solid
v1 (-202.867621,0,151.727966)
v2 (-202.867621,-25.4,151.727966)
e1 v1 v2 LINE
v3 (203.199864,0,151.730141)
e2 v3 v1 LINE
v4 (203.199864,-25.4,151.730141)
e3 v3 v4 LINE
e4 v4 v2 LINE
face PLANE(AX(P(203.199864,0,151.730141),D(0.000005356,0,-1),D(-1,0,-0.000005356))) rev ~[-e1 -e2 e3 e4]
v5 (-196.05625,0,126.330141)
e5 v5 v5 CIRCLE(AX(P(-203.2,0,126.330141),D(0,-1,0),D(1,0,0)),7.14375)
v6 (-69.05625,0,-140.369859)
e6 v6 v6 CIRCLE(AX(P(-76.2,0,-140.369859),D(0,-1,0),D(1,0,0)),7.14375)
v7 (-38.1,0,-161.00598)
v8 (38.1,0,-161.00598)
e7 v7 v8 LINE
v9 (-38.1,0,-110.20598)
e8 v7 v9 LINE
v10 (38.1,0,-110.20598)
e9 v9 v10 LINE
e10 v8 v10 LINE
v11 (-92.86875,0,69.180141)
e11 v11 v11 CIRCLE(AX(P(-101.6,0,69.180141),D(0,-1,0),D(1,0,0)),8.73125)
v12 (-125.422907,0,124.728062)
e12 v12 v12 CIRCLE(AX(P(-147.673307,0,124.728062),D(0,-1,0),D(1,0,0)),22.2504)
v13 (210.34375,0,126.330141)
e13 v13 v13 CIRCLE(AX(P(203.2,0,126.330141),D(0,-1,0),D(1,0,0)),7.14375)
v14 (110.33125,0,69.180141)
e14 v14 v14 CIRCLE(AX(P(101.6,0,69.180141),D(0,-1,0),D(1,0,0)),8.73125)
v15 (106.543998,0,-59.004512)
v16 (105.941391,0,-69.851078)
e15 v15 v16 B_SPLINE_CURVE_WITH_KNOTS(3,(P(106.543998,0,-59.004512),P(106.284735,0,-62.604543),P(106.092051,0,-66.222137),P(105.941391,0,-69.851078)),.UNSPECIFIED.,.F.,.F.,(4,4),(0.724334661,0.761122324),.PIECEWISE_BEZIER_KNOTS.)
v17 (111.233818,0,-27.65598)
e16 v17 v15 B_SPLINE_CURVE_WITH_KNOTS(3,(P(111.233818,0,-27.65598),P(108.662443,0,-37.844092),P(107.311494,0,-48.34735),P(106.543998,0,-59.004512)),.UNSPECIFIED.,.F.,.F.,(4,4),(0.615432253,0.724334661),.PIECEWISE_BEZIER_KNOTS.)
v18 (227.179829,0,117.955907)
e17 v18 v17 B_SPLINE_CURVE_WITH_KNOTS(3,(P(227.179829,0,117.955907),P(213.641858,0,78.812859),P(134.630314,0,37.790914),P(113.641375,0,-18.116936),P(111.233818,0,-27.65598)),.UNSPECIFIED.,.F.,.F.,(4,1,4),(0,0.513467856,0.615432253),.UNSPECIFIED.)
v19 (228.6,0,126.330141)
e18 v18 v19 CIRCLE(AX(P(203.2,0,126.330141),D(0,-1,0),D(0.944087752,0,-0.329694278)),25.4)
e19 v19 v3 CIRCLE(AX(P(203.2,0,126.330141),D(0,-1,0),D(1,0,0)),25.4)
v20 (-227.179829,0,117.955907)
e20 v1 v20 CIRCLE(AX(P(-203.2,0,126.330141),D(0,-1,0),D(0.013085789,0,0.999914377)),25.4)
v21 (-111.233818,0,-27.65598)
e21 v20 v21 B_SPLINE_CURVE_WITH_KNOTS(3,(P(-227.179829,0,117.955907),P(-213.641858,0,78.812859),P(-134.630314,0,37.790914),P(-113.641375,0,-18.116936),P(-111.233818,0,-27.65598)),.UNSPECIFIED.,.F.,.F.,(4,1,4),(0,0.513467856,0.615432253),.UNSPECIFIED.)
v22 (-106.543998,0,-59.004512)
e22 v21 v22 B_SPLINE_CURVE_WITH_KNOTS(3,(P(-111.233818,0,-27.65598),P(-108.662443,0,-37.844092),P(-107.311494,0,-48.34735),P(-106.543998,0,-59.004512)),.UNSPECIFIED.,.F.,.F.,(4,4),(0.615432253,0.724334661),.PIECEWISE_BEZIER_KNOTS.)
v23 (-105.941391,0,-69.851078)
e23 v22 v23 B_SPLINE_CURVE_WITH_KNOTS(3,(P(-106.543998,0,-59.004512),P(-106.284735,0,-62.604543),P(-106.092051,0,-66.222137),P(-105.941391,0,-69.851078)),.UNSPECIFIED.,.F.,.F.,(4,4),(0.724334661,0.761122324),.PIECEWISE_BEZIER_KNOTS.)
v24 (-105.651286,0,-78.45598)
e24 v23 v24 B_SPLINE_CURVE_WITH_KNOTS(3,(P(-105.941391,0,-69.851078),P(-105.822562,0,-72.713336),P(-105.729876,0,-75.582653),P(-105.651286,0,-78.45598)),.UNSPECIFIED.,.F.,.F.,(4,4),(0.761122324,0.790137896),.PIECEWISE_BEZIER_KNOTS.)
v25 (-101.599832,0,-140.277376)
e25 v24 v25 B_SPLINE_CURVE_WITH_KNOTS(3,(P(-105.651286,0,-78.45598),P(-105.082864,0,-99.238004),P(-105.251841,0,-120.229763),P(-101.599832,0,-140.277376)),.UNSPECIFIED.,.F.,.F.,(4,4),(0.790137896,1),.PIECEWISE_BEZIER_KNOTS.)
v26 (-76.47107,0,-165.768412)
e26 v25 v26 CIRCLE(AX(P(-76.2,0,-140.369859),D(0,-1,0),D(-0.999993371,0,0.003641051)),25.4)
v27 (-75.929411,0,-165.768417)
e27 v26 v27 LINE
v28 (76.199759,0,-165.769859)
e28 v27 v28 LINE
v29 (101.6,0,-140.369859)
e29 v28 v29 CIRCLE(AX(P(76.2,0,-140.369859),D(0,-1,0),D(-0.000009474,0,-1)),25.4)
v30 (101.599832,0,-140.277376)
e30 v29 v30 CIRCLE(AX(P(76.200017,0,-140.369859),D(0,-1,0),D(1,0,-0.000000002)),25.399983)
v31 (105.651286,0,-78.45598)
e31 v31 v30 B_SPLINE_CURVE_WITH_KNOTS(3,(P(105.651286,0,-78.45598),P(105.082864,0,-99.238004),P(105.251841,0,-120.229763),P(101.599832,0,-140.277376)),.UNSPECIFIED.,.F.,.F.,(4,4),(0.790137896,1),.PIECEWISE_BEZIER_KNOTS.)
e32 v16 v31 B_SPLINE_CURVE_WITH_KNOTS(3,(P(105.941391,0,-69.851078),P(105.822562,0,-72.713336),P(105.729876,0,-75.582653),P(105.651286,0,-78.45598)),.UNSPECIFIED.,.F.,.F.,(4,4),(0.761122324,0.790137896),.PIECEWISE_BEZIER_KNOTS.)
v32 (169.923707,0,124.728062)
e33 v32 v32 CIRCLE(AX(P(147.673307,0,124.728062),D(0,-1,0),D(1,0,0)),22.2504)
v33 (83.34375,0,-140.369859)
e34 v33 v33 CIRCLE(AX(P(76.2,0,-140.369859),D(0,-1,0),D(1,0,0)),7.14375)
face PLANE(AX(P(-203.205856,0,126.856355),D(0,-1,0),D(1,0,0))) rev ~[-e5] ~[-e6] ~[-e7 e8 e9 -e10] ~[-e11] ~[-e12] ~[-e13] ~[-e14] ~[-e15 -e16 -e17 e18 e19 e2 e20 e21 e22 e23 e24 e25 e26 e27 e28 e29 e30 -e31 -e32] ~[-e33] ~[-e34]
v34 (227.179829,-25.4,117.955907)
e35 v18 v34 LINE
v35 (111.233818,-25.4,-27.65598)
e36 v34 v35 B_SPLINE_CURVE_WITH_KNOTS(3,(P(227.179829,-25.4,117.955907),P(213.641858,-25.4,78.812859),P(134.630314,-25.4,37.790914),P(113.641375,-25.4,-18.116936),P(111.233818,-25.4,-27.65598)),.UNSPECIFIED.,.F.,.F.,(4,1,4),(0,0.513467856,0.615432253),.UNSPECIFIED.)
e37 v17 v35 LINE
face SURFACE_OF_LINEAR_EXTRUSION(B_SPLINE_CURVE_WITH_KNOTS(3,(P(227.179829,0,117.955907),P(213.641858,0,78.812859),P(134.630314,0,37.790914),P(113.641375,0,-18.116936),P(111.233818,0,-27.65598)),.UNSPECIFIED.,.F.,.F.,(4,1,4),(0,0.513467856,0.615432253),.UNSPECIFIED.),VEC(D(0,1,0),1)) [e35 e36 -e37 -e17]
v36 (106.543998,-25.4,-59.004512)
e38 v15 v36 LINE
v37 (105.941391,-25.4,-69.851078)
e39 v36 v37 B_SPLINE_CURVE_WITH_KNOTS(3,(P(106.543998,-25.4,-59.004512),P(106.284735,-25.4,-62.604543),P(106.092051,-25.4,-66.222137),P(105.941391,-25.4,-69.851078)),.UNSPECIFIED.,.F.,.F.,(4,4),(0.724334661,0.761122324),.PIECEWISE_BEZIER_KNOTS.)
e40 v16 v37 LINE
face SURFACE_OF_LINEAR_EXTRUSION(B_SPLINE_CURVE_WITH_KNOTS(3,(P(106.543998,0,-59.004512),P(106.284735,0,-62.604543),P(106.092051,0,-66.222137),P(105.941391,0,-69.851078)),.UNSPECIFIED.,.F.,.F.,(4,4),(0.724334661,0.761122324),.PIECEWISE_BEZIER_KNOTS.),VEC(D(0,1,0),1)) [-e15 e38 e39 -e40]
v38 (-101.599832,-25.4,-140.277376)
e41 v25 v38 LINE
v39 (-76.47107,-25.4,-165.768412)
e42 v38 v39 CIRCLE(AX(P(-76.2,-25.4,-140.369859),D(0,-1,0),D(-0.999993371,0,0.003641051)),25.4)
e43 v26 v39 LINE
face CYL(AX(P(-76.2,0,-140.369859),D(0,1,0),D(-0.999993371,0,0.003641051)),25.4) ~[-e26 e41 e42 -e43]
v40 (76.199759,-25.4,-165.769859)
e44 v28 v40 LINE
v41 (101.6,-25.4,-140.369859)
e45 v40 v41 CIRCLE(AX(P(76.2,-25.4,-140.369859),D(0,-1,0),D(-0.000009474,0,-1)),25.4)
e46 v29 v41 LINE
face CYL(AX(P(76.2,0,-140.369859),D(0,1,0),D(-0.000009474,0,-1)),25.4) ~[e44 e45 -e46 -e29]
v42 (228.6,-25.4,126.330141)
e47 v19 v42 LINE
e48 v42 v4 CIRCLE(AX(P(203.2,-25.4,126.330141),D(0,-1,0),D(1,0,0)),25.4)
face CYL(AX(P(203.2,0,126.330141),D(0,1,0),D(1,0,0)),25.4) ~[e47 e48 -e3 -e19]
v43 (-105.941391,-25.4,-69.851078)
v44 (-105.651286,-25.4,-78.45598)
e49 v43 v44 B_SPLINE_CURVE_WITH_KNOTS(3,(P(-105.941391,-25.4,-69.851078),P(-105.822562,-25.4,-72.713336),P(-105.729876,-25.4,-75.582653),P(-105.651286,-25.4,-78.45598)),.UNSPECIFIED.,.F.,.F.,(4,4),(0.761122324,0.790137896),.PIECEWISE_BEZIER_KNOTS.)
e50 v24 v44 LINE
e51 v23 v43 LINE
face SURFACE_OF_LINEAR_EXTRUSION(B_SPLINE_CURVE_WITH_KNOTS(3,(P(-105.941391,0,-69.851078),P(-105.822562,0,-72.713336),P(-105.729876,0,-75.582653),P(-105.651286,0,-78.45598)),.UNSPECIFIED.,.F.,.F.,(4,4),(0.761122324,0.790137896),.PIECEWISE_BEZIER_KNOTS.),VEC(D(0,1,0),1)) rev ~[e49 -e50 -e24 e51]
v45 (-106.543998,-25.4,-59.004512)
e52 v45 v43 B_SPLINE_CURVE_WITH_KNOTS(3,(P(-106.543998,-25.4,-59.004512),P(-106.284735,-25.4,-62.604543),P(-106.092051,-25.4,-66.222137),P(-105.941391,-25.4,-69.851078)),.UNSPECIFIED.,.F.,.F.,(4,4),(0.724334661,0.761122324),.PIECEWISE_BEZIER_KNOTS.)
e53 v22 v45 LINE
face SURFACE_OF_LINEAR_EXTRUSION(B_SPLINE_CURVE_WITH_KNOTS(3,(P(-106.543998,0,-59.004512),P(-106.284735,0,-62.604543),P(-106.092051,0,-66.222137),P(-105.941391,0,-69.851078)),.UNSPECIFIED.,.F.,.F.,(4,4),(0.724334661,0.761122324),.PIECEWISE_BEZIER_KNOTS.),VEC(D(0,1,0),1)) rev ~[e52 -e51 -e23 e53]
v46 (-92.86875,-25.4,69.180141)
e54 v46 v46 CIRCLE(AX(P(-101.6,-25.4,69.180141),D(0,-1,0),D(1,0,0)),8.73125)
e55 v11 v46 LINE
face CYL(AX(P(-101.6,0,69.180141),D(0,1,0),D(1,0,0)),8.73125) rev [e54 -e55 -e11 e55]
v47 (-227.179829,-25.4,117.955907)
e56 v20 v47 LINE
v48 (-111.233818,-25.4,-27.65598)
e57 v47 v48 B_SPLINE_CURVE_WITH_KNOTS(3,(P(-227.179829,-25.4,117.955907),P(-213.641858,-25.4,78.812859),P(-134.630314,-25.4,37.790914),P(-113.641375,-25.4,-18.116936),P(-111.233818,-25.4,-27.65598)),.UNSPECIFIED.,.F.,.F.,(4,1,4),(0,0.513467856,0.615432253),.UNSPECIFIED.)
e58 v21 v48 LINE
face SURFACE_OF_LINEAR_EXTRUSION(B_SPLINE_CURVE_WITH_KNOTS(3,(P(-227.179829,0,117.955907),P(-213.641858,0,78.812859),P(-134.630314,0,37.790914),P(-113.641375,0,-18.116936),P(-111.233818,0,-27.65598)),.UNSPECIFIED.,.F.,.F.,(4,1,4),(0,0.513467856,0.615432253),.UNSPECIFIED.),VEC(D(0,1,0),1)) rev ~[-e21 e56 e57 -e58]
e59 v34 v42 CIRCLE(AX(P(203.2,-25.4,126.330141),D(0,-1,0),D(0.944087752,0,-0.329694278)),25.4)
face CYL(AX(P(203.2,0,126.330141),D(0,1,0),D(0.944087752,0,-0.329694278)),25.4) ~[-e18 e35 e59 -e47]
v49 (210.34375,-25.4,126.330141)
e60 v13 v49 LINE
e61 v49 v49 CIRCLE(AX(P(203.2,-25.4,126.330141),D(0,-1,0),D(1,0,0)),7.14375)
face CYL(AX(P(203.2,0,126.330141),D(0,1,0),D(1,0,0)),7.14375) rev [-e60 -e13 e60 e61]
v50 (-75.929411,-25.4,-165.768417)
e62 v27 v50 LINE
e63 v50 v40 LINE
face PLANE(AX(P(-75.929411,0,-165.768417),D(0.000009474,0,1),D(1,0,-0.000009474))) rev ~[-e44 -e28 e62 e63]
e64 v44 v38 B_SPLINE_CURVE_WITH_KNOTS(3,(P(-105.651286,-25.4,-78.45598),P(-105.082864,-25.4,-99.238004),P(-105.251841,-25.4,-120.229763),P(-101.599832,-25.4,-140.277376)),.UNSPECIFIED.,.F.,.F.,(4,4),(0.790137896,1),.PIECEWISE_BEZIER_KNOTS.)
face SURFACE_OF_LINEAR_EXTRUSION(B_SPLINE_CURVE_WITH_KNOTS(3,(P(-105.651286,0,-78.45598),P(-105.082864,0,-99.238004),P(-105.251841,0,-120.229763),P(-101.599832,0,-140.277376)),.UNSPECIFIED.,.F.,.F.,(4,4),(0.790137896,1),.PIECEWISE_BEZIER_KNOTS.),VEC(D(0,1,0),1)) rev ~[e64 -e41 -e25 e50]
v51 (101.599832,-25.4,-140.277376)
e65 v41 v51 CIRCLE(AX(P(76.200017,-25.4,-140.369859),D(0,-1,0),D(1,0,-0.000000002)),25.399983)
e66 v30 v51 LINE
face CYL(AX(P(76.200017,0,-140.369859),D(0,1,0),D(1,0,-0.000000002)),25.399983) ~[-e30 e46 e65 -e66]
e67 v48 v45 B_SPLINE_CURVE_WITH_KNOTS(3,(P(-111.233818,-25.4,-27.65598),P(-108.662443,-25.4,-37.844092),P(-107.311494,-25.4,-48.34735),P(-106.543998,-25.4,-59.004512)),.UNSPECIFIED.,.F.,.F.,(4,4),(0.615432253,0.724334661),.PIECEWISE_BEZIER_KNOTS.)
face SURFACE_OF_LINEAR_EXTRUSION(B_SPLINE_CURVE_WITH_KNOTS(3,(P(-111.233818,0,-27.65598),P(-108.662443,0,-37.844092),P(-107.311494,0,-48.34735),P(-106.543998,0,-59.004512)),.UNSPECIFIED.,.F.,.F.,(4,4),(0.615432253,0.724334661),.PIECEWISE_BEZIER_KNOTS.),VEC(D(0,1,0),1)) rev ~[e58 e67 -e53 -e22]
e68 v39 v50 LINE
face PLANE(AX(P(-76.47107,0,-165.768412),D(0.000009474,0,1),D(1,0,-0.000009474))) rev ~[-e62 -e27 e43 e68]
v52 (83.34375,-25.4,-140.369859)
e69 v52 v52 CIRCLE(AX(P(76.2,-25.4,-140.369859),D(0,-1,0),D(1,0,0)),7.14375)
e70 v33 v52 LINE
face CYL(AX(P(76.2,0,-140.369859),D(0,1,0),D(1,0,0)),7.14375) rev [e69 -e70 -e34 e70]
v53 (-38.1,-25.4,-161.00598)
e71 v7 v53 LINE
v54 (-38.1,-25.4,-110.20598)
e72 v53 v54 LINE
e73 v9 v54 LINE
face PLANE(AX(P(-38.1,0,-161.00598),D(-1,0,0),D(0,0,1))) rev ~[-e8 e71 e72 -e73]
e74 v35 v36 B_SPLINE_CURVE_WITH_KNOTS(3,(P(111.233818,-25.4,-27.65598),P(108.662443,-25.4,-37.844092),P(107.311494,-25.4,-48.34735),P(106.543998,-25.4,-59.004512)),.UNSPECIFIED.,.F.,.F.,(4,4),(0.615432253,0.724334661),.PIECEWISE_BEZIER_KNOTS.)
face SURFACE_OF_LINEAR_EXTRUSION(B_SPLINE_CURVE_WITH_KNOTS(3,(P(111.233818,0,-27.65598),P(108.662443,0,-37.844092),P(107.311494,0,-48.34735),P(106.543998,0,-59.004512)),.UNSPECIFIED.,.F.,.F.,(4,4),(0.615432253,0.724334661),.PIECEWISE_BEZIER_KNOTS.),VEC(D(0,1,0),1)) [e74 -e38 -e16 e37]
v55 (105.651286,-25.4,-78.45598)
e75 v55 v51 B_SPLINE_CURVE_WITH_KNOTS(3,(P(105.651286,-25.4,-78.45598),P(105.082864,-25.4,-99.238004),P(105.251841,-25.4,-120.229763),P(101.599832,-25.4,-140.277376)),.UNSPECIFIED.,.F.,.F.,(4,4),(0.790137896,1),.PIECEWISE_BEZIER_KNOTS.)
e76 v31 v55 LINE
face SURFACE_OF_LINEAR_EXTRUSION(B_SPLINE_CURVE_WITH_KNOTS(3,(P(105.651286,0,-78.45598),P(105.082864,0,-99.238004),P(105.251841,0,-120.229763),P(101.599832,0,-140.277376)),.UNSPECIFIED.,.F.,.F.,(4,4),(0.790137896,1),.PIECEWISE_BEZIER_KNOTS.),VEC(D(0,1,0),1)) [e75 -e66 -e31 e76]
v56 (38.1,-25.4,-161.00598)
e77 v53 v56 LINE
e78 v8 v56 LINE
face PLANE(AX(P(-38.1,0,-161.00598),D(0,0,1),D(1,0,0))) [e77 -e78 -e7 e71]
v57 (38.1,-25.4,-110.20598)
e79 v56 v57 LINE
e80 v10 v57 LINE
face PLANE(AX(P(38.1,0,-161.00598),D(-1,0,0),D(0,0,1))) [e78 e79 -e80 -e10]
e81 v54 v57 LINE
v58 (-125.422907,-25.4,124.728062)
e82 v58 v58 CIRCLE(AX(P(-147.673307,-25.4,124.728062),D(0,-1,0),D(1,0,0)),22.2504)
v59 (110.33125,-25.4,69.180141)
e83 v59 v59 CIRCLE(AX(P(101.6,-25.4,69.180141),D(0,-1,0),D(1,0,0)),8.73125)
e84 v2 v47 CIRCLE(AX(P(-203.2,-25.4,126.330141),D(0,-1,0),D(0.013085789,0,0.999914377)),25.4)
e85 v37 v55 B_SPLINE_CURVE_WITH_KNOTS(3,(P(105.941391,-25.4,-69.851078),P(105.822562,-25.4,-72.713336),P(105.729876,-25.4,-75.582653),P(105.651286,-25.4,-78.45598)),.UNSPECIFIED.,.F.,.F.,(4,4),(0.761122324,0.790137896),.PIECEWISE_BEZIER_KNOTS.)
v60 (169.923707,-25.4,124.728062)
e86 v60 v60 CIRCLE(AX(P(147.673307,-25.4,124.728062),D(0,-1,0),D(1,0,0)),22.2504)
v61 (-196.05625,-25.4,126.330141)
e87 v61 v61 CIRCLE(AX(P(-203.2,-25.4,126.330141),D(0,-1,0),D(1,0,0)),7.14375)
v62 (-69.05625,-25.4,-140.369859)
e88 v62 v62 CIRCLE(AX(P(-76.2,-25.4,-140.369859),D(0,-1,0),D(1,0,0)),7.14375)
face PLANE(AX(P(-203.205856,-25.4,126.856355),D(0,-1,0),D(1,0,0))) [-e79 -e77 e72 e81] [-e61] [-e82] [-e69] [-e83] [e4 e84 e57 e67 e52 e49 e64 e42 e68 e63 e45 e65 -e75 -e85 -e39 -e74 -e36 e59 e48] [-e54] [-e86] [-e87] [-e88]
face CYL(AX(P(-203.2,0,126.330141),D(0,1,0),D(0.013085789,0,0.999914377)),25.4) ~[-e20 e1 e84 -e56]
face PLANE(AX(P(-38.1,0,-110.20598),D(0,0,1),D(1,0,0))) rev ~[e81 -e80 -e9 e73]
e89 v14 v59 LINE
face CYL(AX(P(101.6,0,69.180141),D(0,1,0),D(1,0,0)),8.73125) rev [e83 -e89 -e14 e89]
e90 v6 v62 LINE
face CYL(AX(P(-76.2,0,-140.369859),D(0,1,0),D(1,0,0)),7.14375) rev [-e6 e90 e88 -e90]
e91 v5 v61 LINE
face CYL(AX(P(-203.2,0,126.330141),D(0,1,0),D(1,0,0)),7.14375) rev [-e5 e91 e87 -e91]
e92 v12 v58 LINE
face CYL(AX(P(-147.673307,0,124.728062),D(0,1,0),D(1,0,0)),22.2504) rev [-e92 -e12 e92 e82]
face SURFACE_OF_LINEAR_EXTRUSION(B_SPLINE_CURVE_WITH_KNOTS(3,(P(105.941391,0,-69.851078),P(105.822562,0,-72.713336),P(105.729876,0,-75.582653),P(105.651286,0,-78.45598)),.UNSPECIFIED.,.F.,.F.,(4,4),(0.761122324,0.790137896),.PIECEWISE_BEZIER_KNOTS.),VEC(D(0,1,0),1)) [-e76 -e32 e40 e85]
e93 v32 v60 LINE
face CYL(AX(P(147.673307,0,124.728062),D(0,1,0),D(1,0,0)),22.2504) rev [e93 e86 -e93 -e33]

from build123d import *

# Parameters (mm, degrees)
F0_R     = 7.14375
F0_R_2   = 8.73125
F0_R_3   = 22.2504
F0_W     = 76.2
F0_H     = 50.8
F1_DEPTH = 25.4


with BuildPart() as f1:
    # F0 (on Front) → F1 (new body)
    with BuildSketch(Plane.XZ):
        with BuildLine():
            ThreePointArc((-227.1798288962, 117.9559066231), (-198.9530984214, 101.2877007654), (-177.8, 126.3301412811))
            ThreePointArc((-177.8, 126.3301412811), (-185.1223559639, 144.1727528082), (-202.8676209531, 151.7279664669))
            ThreePointArc((-202.8676209531, 151.7279664669), (-223.8140359372, 141.1700038944), (-227.1798288962, 117.9559066231))
        make_face()
        with Locations((-203.2, 126.3301412811)):
            Circle(F0_R, mode=Mode.SUBTRACT)
        with BuildLine():
            ThreePointArc((-202.8676209531, 151.7279664669), (-185.1223559639, 144.1727528082), (-177.8, 126.3301412811))
            ThreePointArc((-177.8, 126.3301412811), (-198.9530984214, 101.2877007654), (-227.1798288962, 117.9559066231))
            add(Edge.make_bspline(
                [(-227.1798288962, 117.9559066231), (-213.6418582626, 78.8128585754), (-134.6303143568, 37.7909136067), (-113.6413747749, -18.1169363843), (-111.2338181852, -27.6559796071)],
                knots=[0, 0, 0, 0, 0.5134678559, 0.6154322526, 0.6154322526, 0.6154322526, 0.6154322526], degree=3))
            Line((-111.2338181852, -27.6559796071), (111.2338181852, -27.6559796071))
            add(Edge.make_bspline(
                [(227.1798288962, 117.9559066231), (213.6418582626, 78.8128585754), (134.6303143568, 37.7909136067), (113.6413747749, -18.1169363843), (111.2338181852, -27.6559796071)],
                knots=[0, 0, 0, 0, 0.5134678559, 0.6154322526, 0.6154322526, 0.6154322526, 0.6154322526], degree=3))
            ThreePointArc((227.1798288962, 117.9559066231), (182.4893469663, 111.6254192192), (203.1998639628, 151.7301412808))
            Line((203.1998639628, 151.7301412808), (-202.8676209531, 151.7279664669))
        make_face()
        with Locations((-101.6, 69.1801412811)):
            Circle(F0_R_2, mode=Mode.SUBTRACT)
        with Locations((-147.6733071194, 124.7280620759)):
            Circle(F0_R_3, mode=Mode.SUBTRACT)
        with Locations((101.6, 69.1801412811)):
            Circle(F0_R_2, mode=Mode.SUBTRACT)
        with Locations((147.6733071194, 124.7280620759)):
            Circle(F0_R_3, mode=Mode.SUBTRACT)
        with BuildLine():
            ThreePointArc((228.6, 126.3301412811), (221.1604641457, 144.2907016196), (203.1998639628, 151.7301412808))
            ThreePointArc((203.1998639628, 151.7301412808), (182.4893469663, 111.6254192192), (227.1798288962, 117.9559066231))
            ThreePointArc((227.1798288962, 117.9559066231), (228.2424405157, 122.0832397026), (228.6, 126.3301412811))
        make_face()
        with Locations((203.2, 126.3301412811)):
            Circle(F0_R, mode=Mode.SUBTRACT)
        with BuildLine():
            Line((111.2338181852, -27.6559796071), (-111.2338181852, -27.6559796071))
            add(Edge.make_bspline(
                [(-111.2338181852, -27.6559796071), (-108.6624430935, -37.8440924207), (-107.3114943085, -48.3473495809), (-106.5439984378, -59.0045117357)],
                knots=[0.6154322526, 0.6154322526, 0.6154322526, 0.6154322526, 0.7243346607, 0.7243346607, 0.7243346607, 0.7243346607], degree=3))
            ThreePointArc((-106.5439984378, -59.0045117357), (-98.7916333235, -57.5943734425), (-94.4499, -64.1698587189))
            ThreePointArc((-94.4499, -64.1698587189), (-98.4312031682, -70.5794341064), (-105.9413914893, -69.8510777735))
            add(Edge.make_bspline(
                [(-105.9413914893, -69.8510777735), (-105.8225617688, -72.7133360171), (-105.7298757075, -75.582653183), (-105.6512856578, -78.4559796071)],
                knots=[0.7611223242, 0.7611223242, 0.7611223242, 0.7611223242, 0.7901378963, 0.7901378963, 0.7901378963, 0.7901378963], degree=3))
            Line((-105.6512856578, -78.4559796071), (105.6512856578, -78.4559796071))
            add(Edge.make_bspline(
                [(105.9413914893, -69.8510777735), (105.8225617688, -72.7133360171), (105.7298757075, -75.582653183), (105.6512856578, -78.4559796071)],
                knots=[0.7611223242, 0.7611223242, 0.7611223242, 0.7611223242, 0.7901378963, 0.7901378963, 0.7901378963, 0.7901378963], degree=3))
            ThreePointArc((105.9413914893, -69.8510777735), (94.4609093557, -63.7732294435), (106.5439984378, -59.0045117357))
            add(Edge.make_bspline(
                [(111.2338181852, -27.6559796071), (108.6624430935, -37.8440924207), (107.3114943085, -48.3473495809), (106.5439984378, -59.0045117357)],
                knots=[0.6154322526, 0.6154322526, 0.6154322526, 0.6154322526, 0.7243346607, 0.7243346607, 0.7243346607, 0.7243346607], degree=3))
        make_face()
        with BuildLine():
            ThreePointArc((-94.4499, -64.1698587189), (-98.7916333235, -57.5943734425), (-106.5439984378, -59.0045117357))
            add(Edge.make_bspline(
                [(-106.5439984378, -59.0045117357), (-106.2847353017, -62.6045431988), (-106.0920508575, -66.2221369929), (-105.9413914893, -69.8510777735)],
                knots=[0.7243346607, 0.7243346607, 0.7243346607, 0.7243346607, 0.7611223242, 0.7611223242, 0.7611223242, 0.7611223242], degree=3))
            ThreePointArc((-105.9413914893, -69.8510777735), (-98.4312031682, -70.5794341064), (-94.4499, -64.1698587189))
        make_face()
        with BuildLine():
            add(Edge.make_bspline(
                [(106.5439984378, -59.0045117357), (106.2847353017, -62.6045431988), (106.0920508575, -66.2221369929), (105.9413914893, -69.8510777735)],
                knots=[0.7243346607, 0.7243346607, 0.7243346607, 0.7243346607, 0.7611223242, 0.7611223242, 0.7611223242, 0.7611223242], degree=3))
            ThreePointArc((106.5439984378, -59.0045117357), (94.4609093557, -63.7732294435), (105.9413914893, -69.8510777735))
        make_face()
        with BuildLine():
            Line((105.6512856578, -78.4559796071), (-105.6512856578, -78.4559796071))
            add(Edge.make_bspline(
                [(-105.6512856578, -78.4559796071), (-105.0828642234, -99.2380039713), (-105.2518408856, -120.2297627942), (-101.5998316324, -140.277376034)],
                knots=[0.7901378963, 0.7901378963, 0.7901378963, 0.7901378963, 1, 1, 1, 1], degree=3))
            ThreePointArc((-101.5998316324, -140.277376034), (-76.1537585809, -114.9699008108), (-50.8, -140.3698587189))
            ThreePointArc((-50.8, -140.3698587189), (-58.1440736415, -158.2344472486), (-75.9294112862, -165.7684173738))
            Line((-75.9294112862, -165.7684173738), (76.1997593484, -165.7698587177))
            ThreePointArc((76.1997593484, -165.7698587177), (58.2069048287, -122.4419886235), (101.5998316324, -140.277376034))
            add(Edge.make_bspline(
                [(105.6512856578, -78.4559796071), (105.0828642234, -99.2380039713), (105.2518408856, -120.2297627942), (101.5998316324, -140.277376034)],
                knots=[0.7901378963, 0.7901378963, 0.7901378963, 0.7901378963, 1, 1, 1, 1], degree=3))
        make_face()
        with Locations((0, -135.6059796071)):
            Rectangle(F0_W, F0_H, mode=Mode.SUBTRACT)
        with BuildLine():
            ThreePointArc((-50.8, -140.3698587189), (-76.1537585809, -114.9699008108), (-101.5998316324, -140.277376034))
            ThreePointArc((-101.5998316324, -140.277376034), (-94.2885883712, -158.2013749399), (-76.4710699897, -165.7684122419))
            Line((-76.4710699897, -165.7684122419), (-75.9294112862, -165.7684173738))
            ThreePointArc((-75.9294112862, -165.7684173738), (-58.1440736415, -158.2344472486), (-50.8, -140.3698587189))
        make_face()
        with Locations((-76.2, -140.3698587189)):
            Circle(F0_R, mode=Mode.SUBTRACT)
        with BuildLine():
            ThreePointArc((101.6, -140.3698587189), (101.5999579081, -140.3236172998), (101.5998316324, -140.277376034))
            ThreePointArc((101.5998316324, -140.277376034), (58.2069048287, -122.4419886235), (76.1997593484, -165.7698587177))
            ThreePointArc((76.1997593484, -165.7698587177), (94.1604271587, -158.330456044), (101.6, -140.3698587189))
        make_face()
        with Locations((76.2, -140.3698587189)):
            Circle(F0_R, mode=Mode.SUBTRACT)
    extrude(amount=F1_DEPTH)


solid = f1.part
